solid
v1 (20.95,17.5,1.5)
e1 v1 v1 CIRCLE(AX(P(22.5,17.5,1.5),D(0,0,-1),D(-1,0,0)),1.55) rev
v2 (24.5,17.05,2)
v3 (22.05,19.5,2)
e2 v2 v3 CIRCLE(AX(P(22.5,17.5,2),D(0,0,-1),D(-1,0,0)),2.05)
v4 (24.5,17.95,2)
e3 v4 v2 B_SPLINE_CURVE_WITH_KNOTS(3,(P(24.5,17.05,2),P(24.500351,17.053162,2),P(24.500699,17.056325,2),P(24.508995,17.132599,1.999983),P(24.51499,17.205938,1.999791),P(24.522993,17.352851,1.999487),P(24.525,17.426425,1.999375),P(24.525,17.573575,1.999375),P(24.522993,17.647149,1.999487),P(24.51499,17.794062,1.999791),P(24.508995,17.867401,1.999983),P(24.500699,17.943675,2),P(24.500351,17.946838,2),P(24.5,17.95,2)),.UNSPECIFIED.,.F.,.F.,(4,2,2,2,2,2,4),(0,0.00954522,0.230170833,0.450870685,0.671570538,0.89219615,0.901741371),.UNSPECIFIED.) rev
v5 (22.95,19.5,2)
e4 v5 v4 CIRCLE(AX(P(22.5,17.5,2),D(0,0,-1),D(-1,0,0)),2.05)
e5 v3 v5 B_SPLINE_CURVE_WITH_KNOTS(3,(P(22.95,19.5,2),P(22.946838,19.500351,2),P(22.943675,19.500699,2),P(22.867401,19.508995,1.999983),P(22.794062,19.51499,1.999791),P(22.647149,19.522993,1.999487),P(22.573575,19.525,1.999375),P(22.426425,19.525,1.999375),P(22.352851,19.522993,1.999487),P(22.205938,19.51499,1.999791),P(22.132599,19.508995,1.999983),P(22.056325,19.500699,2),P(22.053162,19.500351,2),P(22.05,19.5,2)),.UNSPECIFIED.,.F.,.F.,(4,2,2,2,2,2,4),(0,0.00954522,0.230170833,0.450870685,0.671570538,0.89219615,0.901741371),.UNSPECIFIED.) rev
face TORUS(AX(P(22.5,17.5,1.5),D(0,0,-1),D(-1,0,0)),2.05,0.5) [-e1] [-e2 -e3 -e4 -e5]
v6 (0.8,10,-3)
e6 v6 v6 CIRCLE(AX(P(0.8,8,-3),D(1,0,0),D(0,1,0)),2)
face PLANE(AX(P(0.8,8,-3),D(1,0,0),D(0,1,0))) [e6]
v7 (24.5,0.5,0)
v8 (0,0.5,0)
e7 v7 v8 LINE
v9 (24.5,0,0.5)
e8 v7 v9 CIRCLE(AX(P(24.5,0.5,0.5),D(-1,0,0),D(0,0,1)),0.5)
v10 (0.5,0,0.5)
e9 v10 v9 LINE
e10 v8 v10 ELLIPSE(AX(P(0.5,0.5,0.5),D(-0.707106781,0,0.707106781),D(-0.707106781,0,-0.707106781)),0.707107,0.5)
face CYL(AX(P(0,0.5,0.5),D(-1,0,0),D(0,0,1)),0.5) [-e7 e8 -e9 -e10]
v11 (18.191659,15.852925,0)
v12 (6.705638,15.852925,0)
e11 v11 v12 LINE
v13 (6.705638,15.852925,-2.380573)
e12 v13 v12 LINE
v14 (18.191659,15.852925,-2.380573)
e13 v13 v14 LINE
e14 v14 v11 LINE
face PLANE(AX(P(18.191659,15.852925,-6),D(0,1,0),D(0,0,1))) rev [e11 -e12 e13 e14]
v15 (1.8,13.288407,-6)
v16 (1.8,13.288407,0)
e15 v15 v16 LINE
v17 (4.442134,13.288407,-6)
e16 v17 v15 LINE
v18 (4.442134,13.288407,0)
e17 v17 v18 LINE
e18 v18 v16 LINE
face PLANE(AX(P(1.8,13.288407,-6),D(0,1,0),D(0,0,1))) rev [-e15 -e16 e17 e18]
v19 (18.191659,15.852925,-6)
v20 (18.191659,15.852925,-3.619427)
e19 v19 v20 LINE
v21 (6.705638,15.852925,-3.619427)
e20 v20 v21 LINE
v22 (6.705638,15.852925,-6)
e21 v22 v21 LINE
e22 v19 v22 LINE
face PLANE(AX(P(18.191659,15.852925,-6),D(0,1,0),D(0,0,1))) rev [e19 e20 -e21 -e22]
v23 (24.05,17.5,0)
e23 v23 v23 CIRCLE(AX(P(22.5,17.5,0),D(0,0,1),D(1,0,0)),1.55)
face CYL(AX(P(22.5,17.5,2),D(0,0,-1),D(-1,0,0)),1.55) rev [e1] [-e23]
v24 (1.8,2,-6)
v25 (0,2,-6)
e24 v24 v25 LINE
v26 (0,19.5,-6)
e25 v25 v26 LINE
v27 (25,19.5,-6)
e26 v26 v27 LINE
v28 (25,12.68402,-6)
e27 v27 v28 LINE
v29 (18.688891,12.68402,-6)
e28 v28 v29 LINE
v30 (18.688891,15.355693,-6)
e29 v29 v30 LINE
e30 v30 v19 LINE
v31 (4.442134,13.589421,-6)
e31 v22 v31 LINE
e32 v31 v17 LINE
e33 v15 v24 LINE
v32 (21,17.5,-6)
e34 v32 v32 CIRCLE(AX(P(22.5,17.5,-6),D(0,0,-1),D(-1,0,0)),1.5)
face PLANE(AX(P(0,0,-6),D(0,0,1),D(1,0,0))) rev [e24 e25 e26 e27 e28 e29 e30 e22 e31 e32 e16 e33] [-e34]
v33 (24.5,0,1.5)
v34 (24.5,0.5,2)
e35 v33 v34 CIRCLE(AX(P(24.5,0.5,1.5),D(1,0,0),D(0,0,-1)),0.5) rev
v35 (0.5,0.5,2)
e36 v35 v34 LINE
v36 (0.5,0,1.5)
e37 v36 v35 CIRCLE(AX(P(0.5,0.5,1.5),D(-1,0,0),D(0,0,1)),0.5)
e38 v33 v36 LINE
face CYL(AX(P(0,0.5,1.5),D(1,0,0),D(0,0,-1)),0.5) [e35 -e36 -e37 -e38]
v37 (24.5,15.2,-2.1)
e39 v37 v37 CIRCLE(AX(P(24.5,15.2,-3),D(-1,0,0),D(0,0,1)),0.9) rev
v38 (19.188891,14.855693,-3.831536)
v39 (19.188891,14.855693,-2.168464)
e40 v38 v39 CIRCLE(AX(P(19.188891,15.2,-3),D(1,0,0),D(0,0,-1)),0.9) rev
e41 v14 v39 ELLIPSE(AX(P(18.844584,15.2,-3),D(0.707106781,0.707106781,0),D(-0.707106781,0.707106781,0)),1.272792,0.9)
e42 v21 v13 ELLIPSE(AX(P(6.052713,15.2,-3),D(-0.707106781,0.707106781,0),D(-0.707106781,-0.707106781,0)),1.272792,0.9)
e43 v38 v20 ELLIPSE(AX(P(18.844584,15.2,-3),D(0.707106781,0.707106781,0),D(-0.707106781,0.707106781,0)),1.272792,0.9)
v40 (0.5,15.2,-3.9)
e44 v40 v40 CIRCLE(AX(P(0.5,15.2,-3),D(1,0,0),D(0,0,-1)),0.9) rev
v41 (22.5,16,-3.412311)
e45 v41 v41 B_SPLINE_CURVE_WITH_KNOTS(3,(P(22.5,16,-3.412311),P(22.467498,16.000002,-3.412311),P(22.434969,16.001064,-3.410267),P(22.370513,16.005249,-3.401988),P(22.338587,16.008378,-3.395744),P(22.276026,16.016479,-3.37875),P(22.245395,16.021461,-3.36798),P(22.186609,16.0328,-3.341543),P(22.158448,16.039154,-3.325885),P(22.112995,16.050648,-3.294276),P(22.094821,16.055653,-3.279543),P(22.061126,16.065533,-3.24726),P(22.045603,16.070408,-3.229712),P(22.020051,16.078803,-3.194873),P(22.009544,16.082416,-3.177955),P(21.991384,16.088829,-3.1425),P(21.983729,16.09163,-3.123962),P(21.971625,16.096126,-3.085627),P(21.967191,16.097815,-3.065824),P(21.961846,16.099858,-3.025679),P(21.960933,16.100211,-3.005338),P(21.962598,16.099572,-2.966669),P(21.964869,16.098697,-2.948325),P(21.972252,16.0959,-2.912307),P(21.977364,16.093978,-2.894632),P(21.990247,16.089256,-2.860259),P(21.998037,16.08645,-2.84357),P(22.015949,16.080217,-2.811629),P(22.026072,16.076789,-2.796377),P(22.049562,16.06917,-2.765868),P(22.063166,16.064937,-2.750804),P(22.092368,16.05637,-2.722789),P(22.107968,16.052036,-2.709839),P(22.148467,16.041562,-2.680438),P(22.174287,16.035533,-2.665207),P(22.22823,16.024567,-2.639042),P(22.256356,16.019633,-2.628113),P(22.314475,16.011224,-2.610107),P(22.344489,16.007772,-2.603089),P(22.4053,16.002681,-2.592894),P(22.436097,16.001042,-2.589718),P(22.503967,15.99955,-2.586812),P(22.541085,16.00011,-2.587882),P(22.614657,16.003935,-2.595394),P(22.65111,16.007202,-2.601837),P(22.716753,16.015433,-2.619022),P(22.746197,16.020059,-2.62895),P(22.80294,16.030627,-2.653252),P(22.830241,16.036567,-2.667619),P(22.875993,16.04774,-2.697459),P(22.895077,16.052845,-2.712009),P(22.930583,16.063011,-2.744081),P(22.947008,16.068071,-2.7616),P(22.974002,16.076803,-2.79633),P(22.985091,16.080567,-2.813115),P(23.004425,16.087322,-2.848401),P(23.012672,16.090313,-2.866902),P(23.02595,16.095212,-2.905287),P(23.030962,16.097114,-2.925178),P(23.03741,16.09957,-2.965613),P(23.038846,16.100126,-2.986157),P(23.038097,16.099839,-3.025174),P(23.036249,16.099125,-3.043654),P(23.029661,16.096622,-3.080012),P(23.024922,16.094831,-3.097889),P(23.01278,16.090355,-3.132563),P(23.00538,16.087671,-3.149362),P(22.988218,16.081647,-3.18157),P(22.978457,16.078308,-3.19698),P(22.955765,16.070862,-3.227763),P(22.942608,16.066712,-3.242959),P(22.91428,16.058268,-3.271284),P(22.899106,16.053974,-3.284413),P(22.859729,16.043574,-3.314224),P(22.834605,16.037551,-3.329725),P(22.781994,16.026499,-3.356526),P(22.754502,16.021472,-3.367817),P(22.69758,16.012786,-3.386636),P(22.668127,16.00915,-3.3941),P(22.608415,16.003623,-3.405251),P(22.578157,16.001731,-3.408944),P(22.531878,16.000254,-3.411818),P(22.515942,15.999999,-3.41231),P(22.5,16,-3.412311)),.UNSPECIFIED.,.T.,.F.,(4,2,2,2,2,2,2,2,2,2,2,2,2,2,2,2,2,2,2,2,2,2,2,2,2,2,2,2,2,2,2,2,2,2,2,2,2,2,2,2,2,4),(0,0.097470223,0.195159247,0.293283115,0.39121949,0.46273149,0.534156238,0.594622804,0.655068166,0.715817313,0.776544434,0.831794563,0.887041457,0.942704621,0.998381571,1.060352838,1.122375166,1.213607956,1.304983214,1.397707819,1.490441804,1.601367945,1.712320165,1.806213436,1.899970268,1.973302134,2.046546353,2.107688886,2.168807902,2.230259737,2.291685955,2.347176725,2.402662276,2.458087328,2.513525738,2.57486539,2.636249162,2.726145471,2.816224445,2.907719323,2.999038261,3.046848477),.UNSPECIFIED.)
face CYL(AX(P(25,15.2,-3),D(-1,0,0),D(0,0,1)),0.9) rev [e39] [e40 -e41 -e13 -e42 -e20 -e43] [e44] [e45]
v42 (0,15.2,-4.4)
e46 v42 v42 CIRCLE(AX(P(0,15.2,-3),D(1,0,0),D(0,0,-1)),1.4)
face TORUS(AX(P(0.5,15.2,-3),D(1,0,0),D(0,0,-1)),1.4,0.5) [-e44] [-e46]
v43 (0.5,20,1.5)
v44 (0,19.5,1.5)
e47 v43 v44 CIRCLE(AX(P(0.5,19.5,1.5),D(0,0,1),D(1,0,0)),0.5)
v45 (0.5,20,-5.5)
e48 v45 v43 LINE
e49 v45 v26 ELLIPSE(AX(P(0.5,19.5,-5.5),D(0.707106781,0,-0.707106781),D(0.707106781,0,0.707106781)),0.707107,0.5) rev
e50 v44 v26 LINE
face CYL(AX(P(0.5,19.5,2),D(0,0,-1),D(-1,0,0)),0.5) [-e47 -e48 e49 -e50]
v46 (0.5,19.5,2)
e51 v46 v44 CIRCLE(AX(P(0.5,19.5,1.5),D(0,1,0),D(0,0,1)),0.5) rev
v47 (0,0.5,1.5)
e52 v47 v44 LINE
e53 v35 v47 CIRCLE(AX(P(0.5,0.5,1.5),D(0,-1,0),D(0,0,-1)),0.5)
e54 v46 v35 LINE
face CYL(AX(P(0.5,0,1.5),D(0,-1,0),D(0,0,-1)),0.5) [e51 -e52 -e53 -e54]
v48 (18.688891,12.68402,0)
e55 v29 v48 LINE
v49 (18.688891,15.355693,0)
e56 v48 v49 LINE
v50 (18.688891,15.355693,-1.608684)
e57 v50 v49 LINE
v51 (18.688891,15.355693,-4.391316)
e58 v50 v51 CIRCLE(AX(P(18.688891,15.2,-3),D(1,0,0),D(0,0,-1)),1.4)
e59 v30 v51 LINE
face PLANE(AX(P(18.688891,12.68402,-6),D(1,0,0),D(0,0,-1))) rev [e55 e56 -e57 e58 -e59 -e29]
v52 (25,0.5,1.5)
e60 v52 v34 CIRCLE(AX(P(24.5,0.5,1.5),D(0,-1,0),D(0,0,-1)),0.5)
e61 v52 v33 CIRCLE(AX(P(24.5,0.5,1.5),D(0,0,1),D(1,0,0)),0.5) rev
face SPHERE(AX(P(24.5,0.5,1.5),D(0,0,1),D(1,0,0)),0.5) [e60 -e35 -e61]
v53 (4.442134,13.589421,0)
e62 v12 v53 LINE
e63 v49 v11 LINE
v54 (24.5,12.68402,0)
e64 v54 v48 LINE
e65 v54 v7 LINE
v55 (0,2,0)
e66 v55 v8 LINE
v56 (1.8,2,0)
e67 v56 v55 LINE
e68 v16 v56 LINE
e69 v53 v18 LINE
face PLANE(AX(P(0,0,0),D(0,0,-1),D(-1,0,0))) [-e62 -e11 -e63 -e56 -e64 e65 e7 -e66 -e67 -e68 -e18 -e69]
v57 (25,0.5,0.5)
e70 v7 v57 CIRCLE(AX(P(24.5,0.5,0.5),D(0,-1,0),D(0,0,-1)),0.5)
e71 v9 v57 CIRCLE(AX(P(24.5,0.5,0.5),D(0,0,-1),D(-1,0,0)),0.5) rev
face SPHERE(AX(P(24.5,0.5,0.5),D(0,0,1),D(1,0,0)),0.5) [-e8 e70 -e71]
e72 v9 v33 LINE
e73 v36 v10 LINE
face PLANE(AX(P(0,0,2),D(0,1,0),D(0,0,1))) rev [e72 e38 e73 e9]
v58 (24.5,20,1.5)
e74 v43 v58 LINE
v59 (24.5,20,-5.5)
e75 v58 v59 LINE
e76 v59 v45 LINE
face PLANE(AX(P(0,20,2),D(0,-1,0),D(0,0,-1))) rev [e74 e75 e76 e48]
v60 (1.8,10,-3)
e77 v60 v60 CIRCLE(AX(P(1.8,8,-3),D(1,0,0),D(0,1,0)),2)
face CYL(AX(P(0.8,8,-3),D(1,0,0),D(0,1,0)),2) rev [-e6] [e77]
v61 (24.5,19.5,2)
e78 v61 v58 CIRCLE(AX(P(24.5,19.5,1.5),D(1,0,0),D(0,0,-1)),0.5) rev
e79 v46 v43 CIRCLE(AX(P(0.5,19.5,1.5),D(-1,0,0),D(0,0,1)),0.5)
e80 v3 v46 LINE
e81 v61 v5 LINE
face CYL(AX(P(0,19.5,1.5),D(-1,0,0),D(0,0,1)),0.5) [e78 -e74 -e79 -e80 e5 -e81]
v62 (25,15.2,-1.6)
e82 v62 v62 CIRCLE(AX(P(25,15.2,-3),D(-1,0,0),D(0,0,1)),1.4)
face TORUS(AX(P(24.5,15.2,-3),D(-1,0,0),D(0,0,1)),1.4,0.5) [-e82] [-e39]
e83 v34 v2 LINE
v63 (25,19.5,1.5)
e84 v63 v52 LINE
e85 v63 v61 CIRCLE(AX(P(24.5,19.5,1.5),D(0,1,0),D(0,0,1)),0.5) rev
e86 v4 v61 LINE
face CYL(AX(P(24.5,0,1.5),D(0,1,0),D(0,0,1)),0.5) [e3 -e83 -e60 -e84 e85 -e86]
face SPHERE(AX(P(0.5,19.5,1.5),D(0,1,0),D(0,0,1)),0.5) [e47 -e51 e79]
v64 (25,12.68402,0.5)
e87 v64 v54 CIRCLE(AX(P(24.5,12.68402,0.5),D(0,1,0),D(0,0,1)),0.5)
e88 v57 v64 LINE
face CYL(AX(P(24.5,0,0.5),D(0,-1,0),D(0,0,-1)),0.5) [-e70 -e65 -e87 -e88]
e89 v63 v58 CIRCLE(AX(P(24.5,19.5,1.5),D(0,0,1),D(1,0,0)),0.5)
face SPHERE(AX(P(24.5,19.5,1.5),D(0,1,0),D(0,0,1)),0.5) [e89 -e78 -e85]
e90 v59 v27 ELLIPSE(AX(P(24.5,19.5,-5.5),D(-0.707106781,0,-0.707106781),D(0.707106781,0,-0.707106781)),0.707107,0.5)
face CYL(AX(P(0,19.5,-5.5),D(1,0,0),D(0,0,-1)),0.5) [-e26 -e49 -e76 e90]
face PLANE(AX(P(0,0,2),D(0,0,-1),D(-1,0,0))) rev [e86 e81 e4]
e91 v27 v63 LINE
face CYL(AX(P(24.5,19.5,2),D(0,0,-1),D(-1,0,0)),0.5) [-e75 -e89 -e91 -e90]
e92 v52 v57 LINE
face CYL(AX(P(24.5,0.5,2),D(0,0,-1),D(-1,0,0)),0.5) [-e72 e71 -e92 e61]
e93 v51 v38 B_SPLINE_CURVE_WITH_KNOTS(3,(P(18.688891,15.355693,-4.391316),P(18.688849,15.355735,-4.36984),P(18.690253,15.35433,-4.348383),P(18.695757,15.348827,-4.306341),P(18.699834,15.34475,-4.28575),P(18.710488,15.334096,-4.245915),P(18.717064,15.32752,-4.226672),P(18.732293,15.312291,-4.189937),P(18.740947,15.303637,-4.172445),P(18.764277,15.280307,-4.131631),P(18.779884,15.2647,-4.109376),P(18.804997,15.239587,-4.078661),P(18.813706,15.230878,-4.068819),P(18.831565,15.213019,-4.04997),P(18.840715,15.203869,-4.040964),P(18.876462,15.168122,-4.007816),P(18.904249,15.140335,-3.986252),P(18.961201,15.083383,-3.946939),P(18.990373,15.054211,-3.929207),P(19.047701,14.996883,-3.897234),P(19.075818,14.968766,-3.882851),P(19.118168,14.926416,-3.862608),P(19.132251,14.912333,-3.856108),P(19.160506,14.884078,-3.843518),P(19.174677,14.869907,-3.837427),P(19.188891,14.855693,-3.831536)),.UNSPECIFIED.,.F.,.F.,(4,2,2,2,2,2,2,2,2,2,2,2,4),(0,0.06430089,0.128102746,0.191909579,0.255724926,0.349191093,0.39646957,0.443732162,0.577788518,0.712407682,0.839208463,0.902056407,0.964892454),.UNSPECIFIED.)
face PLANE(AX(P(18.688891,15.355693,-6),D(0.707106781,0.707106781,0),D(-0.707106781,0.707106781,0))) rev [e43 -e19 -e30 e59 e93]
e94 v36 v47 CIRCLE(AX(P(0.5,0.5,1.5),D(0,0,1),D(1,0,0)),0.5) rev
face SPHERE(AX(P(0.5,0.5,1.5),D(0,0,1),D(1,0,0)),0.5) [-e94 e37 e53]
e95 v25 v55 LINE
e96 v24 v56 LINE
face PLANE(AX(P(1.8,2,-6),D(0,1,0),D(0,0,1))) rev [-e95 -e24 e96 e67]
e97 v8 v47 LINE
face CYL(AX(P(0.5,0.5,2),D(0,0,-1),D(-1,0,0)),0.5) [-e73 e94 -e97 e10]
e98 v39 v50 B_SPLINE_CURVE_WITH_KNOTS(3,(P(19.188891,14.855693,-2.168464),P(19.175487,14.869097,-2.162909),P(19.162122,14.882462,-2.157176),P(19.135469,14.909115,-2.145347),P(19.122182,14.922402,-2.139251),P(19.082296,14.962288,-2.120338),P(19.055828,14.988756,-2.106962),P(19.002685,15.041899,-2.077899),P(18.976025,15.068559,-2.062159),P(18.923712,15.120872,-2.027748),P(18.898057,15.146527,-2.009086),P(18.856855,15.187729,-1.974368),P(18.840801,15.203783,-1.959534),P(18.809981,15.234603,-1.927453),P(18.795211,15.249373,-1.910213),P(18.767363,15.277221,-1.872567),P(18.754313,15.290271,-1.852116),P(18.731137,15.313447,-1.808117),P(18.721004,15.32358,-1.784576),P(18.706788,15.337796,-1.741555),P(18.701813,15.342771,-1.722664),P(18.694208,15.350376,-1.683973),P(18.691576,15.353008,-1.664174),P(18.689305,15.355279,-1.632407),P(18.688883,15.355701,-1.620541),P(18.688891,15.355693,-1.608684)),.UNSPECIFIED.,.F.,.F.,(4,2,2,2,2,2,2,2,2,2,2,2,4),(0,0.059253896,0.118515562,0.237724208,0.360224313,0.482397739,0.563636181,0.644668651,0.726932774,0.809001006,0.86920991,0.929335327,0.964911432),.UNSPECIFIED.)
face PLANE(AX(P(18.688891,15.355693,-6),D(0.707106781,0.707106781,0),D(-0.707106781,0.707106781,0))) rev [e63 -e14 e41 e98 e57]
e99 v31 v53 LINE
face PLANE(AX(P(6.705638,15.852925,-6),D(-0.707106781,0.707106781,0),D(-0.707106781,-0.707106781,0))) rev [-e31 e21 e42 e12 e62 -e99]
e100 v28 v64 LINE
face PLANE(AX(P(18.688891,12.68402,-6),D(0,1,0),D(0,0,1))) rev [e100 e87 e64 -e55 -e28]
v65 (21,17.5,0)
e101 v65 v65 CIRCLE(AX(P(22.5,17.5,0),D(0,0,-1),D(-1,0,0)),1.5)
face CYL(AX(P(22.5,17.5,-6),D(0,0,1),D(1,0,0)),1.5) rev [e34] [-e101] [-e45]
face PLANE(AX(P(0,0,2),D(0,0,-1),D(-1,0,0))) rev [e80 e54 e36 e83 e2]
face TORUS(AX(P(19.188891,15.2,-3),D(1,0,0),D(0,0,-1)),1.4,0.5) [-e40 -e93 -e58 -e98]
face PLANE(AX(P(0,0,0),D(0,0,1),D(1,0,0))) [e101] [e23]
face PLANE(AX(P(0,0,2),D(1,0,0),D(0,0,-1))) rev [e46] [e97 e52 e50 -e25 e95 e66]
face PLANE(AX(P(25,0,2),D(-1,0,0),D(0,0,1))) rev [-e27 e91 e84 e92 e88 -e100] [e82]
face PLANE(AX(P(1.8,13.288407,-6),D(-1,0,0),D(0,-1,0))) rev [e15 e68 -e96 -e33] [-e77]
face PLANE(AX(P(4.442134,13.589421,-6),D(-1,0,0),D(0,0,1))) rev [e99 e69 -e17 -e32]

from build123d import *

# Parameters (mm, degrees)
ESQUISSE1_W             = 25
ESQUISSE1_H             = 20
ESQUISSE1_R             = 1.55
BOSS_EXTRU_1_DEPTH      = 2
ESQUISSE2_R             = 1.5
BOSS_EXTRU_2_DEPTH      = 6
ESQUISSE3_R             = 2
ENL_V_MAT_EXTRU_1_DEPTH = 1
ESQUISSE4_R             = 0.9
ENL_V_MAT_EXTRU_2_DEPTH = 33.57299495
CONG_1_R                = 0.5
CONG_5_R                = 0.5
CONG_6_R                = 0.5


with BuildPart() as part:
    # Esquisse1 → Boss.-Extru.1 (new body)
    with BuildSketch(Plane.XY):
        with Locations((12.5, 10)):
            Rectangle(ESQUISSE1_W, ESQUISSE1_H)
        with Locations((22.5, 17.5)):
            Circle(ESQUISSE1_R, mode=Mode.SUBTRACT)
    extrude(amount=BOSS_EXTRU_1_DEPTH)

    # Esquisse2 → Boss.-Extru.2 (add)
    with BuildSketch(Plane(origin=(0, 0, 0), x_dir=(-1, 0, 0), z_dir=(0, 0, -1))):
        Polygon((-18.688890735, 12.684019913), (-18.688890735, 15.355693182), (-18.19165929, 15.852924628), (-6.705637613, 15.852924628), (-4.442134245, 13.58942126), (-4.442134245, 13.288407081), (-1.8, 13.288407081), (-1.8, 2), (0, 2), (0, 13.565515823), (0, 20), (-25, 20), (-25, 12.684019913), align=None)
        with Locations((-22.5, 17.5)):
            Circle(ESQUISSE2_R, mode=Mode.SUBTRACT)
    extrude(amount=BOSS_EXTRU_2_DEPTH)

    # Esquisse3 → Enlèv. mat.-Extru.1 (cut)
    with BuildSketch(Plane(origin=(1.8, 0, 0), x_dir=(0, 0, -1), z_dir=(1, 0, 0))):
        with Locations(Location((3, 8, 0), (0, 0, 90))):
            Circle(ESQUISSE3_R)
    extrude(amount=-ENL_V_MAT_EXTRU_1_DEPTH, mode=Mode.SUBTRACT)

    # Esquisse4 → Enlèv. mat.-Extru.2 (cut, through all)
    with BuildSketch(Plane.ZY):
        with Locations((-3, 15.2)):
            Circle(ESQUISSE4_R)
    extrude(amount=-ENL_V_MAT_EXTRU_2_DEPTH, mode=Mode.SUBTRACT)

    # Congé1
    # the kernel refuses this fillet: 0.5 mm, written as the material it takes off along each edge
    with BuildSketch(Plane(origin=(25, 15.2, -3), x_dir=(0, 0, 1), z_dir=(0, -1, 0))) as cong_1_piece_1:
        with BuildLine():
            CenterArc((0.9 + CONG_1_R, CONG_1_R), CONG_1_R, 180, 90)
            Line((0.9, CONG_1_R), (0.9, 0))
            Line((0.9, 0), (0.9 + CONG_1_R, 0))
        make_face()
    revolve(axis=Axis((25, 15.2, -3), (-1, 0, 0)), mode=Mode.SUBTRACT)
    with BuildSketch(Plane(origin=(18.688890735, 15.2, -3), x_dir=(0, 0.9999845857082649, -0.005552327968503009), z_dir=(0, 0.005552327968503009, 0.9999845857082649))) as cong_1_piece_2_section:
        with BuildLine():
            CenterArc((0.9 + CONG_1_R, -CONG_1_R), CONG_1_R, 90, 90)
            Line((0.9 + CONG_1_R, 0), (0.9, 0))
            Line((0.9, 0), (0.9, -CONG_1_R))
        make_face()
    cong_1_piece_2 = revolve(axis=Axis((18.688890735, 15.2, -3), (-1, 0, 0)), revolution_arc=269.681873406, mode=Mode.PRIVATE)
    cong_1_piece_2 = split(cong_1_piece_2, bisect_by=Plane(origin=(19.358402527, 14.68618139, -3.05957258), z_dir=(-0.7071067811865438, -0.7071067811865513, 0)), keep=Keep.TOP, mode=Mode.PRIVATE)
    add(cong_1_piece_2, mode=Mode.SUBTRACT)
    with BuildSketch(Plane(origin=(0, 15.2, -3), x_dir=(0, 0, 1), z_dir=(0, -1, 0))) as cong_1_piece_3:
        with BuildLine():
            CenterArc((0.9 + CONG_1_R, -CONG_1_R), CONG_1_R, 90, 90)
            Line((0.9, -CONG_1_R), (0.9, 0))
            Line((0.9, 0), (0.9 + CONG_1_R, 0))
        make_face()
    revolve(axis=Axis((0, 15.2, -3), (-1, 0, 0)), mode=Mode.SUBTRACT)
    with BuildSketch(Plane(origin=(18.688890735, 15.2, -3), x_dir=(0, 0, 1), z_dir=(0, -1, 0))) as cong_1_piece_4_section:
        with BuildLine():
            CenterArc((0.9 + CONG_1_R, -CONG_1_R), CONG_1_R, 90, 90)
            Line((0.9 + CONG_1_R, 0), (0.9, 0))
            Line((0.9, 0), (0.9, -CONG_1_R))
        make_face()
    cong_1_piece_4 = revolve(axis=Axis((18.688890735, 15.2, -3), (-1, 0, 0)), revolution_arc=89.539713829, mode=Mode.PRIVATE)
    cong_1_piece_4 = split(cong_1_piece_4, bisect_by=Plane(origin=(18.759427014, 15.285156904, -1.94281096), z_dir=(-0.7071067811865438, -0.7071067811865513, 0)), keep=Keep.TOP, mode=Mode.PRIVATE)
    add(cong_1_piece_4, mode=Mode.SUBTRACT)

    # Congé5
    # the kernel refuses this fillet: 0.5 mm, written as the material it takes off along each edge
    with BuildSketch(Plane(origin=(24.5, 0.5, 1.5), x_dir=(0, 0, 1), z_dir=(0, -1, 0))) as cong_5_piece_1_section:
        Polygon((0, 0), (CONG_5_R, 0), (CONG_5_R, -CONG_5_R), (0, -CONG_5_R), align=None)
    cong_5_piece_1 = extrude(amount=CONG_5_R, mode=Mode.PRIVATE)
    cong_5_piece_1 = cong_5_piece_1 - Plane(origin=(24.5, 0.5, 1.5), x_dir=(-0.7071067811865475, 0, -0.7071067811865475), z_dir=(0, -1, 0)) * Sphere(CONG_5_R, mode=Mode.PRIVATE)
    add(cong_5_piece_1, mode=Mode.SUBTRACT)
    with BuildSketch(Plane(origin=(24.5, 19.5, 1.5), x_dir=(1, 0, 0), z_dir=(0, 0, 1))) as cong_5_piece_2_section:
        Polygon((0, 0), (CONG_5_R, 0), (CONG_5_R, CONG_5_R), (0, CONG_5_R), align=None)
    cong_5_piece_2 = extrude(amount=CONG_5_R, mode=Mode.PRIVATE)
    cong_5_piece_2 = cong_5_piece_2 - Plane(origin=(24.5, 19.5, 1.5), x_dir=(-0.7071067811865475, -0.7071067811865475, 0), z_dir=(0, 0, 1)) * Sphere(CONG_5_R, mode=Mode.PRIVATE)
    add(cong_5_piece_2, mode=Mode.SUBTRACT)
    with BuildSketch(Plane(origin=(0.5, 19.5, 1.5), x_dir=(-1, 0, 0), z_dir=(0, 0, 1))) as cong_5_piece_3_section:
        Polygon((0, 0), (CONG_5_R, 0), (CONG_5_R, -CONG_5_R), (0, -CONG_5_R), align=None)
    cong_5_piece_3 = extrude(amount=CONG_5_R, mode=Mode.PRIVATE)
    cong_5_piece_3 = cong_5_piece_3 - Plane(origin=(0.5, 19.5, 1.5), x_dir=(0.7071067811865475, -0.7071067811865475, 0), z_dir=(0, 0, 1)) * Sphere(CONG_5_R, mode=Mode.PRIVATE)
    add(cong_5_piece_3, mode=Mode.SUBTRACT)
    with BuildSketch(Plane(origin=(0.5, 0.5, 1.5), x_dir=(0, 0, 1), z_dir=(0, -1, 0))) as cong_5_piece_4_section:
        Polygon((0, 0), (CONG_5_R, 0), (CONG_5_R, CONG_5_R), (0, CONG_5_R), align=None)
    cong_5_piece_4 = extrude(amount=CONG_5_R, mode=Mode.PRIVATE)
    cong_5_piece_4 = cong_5_piece_4 - Plane(origin=(0.5, 0.5, 1.5), x_dir=(0.7071067811865475, 0, -0.7071067811865475), z_dir=(0, -1, 0)) * Sphere(CONG_5_R, mode=Mode.PRIVATE)
    add(cong_5_piece_4, mode=Mode.SUBTRACT)
    with BuildSketch(Plane(origin=(22.5, 17.5, 2), x_dir=(1, 0, 0), z_dir=(0, -1, 0))) as cong_5_piece_5:
        with BuildLine():
            CenterArc((1.55 + CONG_5_R, -CONG_5_R), CONG_5_R, 90, 90)
            Line((1.55, -CONG_5_R), (1.55, 0))
            Line((1.55, 0), (1.55 + CONG_5_R, 0))
        make_face()
    revolve(axis=Axis((22.5, 17.5, 2), (0, 0, 1)), mode=Mode.SUBTRACT)
    with BuildSketch(Plane(origin=(25, 0.5, 2), x_dir=(-1, 0, 0), z_dir=(0, 1, 0)), Plane(origin=(0, 19.5, 2), x_dir=(1, 0, 0), z_dir=(0, -1, 0))) as cong_5_piece_6:
        with BuildLine():
            CenterArc((CONG_5_R, -CONG_5_R), CONG_5_R, 90, 90)
            Line((0, -CONG_5_R), (0, 0))
            Line((0, 0), (CONG_5_R, 0))
        make_face()
    extrude(amount=19, mode=Mode.SUBTRACT)
    with BuildSketch(Plane(origin=(24.5, 20, 2), x_dir=(0, -1, 0), z_dir=(-1, 0, 0))) as cong_5_piece_7:
        with BuildLine():
            CenterArc((CONG_5_R, -CONG_5_R), CONG_5_R, 90, 90)
            Line((0, -CONG_5_R), (0, 0))
            Line((0, 0), (CONG_5_R, 0))
        make_face()
    extrude(amount=24, mode=Mode.SUBTRACT)
    with BuildSketch(Plane(origin=(-1.25, 20, -6), x_dir=(0, -1, 0), z_dir=(1, 0, 0)), Plane(origin=(-1.25, 0, 0), x_dir=(0, 0, 1), z_dir=(1, 0, 0))) as cong_5_piece_8:
        with BuildLine():
            CenterArc((CONG_5_R, -CONG_5_R), CONG_5_R, 90, 90)
            Line((0, -CONG_5_R), (0, 0))
            Line((0, 0), (CONG_5_R, 0))
        make_face()
    extrude(amount=27.5, mode=Mode.SUBTRACT)
    with BuildSketch(Plane(origin=(0, 20, 1.5), x_dir=(1, 0, 0), z_dir=(0, 0, -1)), Plane(origin=(25, 20, -7.25), x_dir=(-1, 0, 0), z_dir=(0, 0, 1))) as cong_5_piece_9:
        with BuildLine():
            CenterArc((CONG_5_R, CONG_5_R), CONG_5_R, 180, 90)
            Line((0, CONG_5_R), (0, 0))
            Line((0, 0), (CONG_5_R, 0))
        make_face()
    extrude(amount=8.75, mode=Mode.SUBTRACT)
    with BuildSketch(Plane(origin=(25, 0, -1.25), x_dir=(-1, 0, 0), z_dir=(0, 0, 1))) as cong_5_piece_10:
        with BuildLine():
            CenterArc((CONG_5_R, -CONG_5_R), CONG_5_R, 90, 90)
            Line((0, -CONG_5_R), (0, 0))
            Line((0, 0), (CONG_5_R, 0))
        make_face()
    extrude(amount=2.75, mode=Mode.SUBTRACT)
    with BuildSketch(Plane(origin=(0, 0, -1.25), x_dir=(1, 0, 0), z_dir=(0, 0, 1))) as cong_5_piece_11:
        with BuildLine():
            CenterArc((CONG_5_R, CONG_5_R), CONG_5_R, 180, 90)
            Line((0, CONG_5_R), (0, 0))
            Line((0, 0), (CONG_5_R, 0))
        make_face()
    extrude(amount=2.75, mode=Mode.SUBTRACT)
    with BuildSketch(Plane(origin=(0.5, 0, 2), x_dir=(0, 0, -1), z_dir=(1, 0, 0))) as cong_5_piece_12:
        with BuildLine():
            CenterArc((CONG_5_R, CONG_5_R), CONG_5_R, 180, 90)
            Line((0, CONG_5_R), (0, 0))
            Line((0, 0), (CONG_5_R, 0))
        make_face()
    extrude(amount=24, mode=Mode.SUBTRACT)

    # Congé6
    # the kernel refuses this fillet: 0.5 mm, written as the material it takes off along each edge
    with BuildSketch(Plane(origin=(24.5, 0.5, 0.5), x_dir=(1, 0, 0), z_dir=(0, 0, -1))) as cong_6_piece_1_section:
        Polygon((0, 0), (CONG_6_R, 0), (CONG_6_R, CONG_6_R), (0, CONG_6_R), align=None)
    cong_6_piece_1 = extrude(amount=CONG_6_R, mode=Mode.PRIVATE)
    cong_6_piece_1 = cong_6_piece_1 - Plane(origin=(24.5, 0.5, 0.5), x_dir=(-0.7071067811865475, 0.7071067811865475, 0), z_dir=(0, 0, -1)) * Sphere(CONG_6_R, mode=Mode.PRIVATE)
    add(cong_6_piece_1, mode=Mode.SUBTRACT)
    with BuildSketch(Plane(origin=(25, 0.5, 0), x_dir=(-1, 0, 0), z_dir=(0, 1, 0))) as cong_6_piece_2:
        with BuildLine():
            CenterArc((CONG_6_R, CONG_6_R), CONG_6_R, 180, 90)
            Line((0, CONG_6_R), (0, 0))
            Line((0, 0), (CONG_6_R, 0))
        make_face()
    extrude(amount=12.184019913, mode=Mode.SUBTRACT)


solid = part.part
